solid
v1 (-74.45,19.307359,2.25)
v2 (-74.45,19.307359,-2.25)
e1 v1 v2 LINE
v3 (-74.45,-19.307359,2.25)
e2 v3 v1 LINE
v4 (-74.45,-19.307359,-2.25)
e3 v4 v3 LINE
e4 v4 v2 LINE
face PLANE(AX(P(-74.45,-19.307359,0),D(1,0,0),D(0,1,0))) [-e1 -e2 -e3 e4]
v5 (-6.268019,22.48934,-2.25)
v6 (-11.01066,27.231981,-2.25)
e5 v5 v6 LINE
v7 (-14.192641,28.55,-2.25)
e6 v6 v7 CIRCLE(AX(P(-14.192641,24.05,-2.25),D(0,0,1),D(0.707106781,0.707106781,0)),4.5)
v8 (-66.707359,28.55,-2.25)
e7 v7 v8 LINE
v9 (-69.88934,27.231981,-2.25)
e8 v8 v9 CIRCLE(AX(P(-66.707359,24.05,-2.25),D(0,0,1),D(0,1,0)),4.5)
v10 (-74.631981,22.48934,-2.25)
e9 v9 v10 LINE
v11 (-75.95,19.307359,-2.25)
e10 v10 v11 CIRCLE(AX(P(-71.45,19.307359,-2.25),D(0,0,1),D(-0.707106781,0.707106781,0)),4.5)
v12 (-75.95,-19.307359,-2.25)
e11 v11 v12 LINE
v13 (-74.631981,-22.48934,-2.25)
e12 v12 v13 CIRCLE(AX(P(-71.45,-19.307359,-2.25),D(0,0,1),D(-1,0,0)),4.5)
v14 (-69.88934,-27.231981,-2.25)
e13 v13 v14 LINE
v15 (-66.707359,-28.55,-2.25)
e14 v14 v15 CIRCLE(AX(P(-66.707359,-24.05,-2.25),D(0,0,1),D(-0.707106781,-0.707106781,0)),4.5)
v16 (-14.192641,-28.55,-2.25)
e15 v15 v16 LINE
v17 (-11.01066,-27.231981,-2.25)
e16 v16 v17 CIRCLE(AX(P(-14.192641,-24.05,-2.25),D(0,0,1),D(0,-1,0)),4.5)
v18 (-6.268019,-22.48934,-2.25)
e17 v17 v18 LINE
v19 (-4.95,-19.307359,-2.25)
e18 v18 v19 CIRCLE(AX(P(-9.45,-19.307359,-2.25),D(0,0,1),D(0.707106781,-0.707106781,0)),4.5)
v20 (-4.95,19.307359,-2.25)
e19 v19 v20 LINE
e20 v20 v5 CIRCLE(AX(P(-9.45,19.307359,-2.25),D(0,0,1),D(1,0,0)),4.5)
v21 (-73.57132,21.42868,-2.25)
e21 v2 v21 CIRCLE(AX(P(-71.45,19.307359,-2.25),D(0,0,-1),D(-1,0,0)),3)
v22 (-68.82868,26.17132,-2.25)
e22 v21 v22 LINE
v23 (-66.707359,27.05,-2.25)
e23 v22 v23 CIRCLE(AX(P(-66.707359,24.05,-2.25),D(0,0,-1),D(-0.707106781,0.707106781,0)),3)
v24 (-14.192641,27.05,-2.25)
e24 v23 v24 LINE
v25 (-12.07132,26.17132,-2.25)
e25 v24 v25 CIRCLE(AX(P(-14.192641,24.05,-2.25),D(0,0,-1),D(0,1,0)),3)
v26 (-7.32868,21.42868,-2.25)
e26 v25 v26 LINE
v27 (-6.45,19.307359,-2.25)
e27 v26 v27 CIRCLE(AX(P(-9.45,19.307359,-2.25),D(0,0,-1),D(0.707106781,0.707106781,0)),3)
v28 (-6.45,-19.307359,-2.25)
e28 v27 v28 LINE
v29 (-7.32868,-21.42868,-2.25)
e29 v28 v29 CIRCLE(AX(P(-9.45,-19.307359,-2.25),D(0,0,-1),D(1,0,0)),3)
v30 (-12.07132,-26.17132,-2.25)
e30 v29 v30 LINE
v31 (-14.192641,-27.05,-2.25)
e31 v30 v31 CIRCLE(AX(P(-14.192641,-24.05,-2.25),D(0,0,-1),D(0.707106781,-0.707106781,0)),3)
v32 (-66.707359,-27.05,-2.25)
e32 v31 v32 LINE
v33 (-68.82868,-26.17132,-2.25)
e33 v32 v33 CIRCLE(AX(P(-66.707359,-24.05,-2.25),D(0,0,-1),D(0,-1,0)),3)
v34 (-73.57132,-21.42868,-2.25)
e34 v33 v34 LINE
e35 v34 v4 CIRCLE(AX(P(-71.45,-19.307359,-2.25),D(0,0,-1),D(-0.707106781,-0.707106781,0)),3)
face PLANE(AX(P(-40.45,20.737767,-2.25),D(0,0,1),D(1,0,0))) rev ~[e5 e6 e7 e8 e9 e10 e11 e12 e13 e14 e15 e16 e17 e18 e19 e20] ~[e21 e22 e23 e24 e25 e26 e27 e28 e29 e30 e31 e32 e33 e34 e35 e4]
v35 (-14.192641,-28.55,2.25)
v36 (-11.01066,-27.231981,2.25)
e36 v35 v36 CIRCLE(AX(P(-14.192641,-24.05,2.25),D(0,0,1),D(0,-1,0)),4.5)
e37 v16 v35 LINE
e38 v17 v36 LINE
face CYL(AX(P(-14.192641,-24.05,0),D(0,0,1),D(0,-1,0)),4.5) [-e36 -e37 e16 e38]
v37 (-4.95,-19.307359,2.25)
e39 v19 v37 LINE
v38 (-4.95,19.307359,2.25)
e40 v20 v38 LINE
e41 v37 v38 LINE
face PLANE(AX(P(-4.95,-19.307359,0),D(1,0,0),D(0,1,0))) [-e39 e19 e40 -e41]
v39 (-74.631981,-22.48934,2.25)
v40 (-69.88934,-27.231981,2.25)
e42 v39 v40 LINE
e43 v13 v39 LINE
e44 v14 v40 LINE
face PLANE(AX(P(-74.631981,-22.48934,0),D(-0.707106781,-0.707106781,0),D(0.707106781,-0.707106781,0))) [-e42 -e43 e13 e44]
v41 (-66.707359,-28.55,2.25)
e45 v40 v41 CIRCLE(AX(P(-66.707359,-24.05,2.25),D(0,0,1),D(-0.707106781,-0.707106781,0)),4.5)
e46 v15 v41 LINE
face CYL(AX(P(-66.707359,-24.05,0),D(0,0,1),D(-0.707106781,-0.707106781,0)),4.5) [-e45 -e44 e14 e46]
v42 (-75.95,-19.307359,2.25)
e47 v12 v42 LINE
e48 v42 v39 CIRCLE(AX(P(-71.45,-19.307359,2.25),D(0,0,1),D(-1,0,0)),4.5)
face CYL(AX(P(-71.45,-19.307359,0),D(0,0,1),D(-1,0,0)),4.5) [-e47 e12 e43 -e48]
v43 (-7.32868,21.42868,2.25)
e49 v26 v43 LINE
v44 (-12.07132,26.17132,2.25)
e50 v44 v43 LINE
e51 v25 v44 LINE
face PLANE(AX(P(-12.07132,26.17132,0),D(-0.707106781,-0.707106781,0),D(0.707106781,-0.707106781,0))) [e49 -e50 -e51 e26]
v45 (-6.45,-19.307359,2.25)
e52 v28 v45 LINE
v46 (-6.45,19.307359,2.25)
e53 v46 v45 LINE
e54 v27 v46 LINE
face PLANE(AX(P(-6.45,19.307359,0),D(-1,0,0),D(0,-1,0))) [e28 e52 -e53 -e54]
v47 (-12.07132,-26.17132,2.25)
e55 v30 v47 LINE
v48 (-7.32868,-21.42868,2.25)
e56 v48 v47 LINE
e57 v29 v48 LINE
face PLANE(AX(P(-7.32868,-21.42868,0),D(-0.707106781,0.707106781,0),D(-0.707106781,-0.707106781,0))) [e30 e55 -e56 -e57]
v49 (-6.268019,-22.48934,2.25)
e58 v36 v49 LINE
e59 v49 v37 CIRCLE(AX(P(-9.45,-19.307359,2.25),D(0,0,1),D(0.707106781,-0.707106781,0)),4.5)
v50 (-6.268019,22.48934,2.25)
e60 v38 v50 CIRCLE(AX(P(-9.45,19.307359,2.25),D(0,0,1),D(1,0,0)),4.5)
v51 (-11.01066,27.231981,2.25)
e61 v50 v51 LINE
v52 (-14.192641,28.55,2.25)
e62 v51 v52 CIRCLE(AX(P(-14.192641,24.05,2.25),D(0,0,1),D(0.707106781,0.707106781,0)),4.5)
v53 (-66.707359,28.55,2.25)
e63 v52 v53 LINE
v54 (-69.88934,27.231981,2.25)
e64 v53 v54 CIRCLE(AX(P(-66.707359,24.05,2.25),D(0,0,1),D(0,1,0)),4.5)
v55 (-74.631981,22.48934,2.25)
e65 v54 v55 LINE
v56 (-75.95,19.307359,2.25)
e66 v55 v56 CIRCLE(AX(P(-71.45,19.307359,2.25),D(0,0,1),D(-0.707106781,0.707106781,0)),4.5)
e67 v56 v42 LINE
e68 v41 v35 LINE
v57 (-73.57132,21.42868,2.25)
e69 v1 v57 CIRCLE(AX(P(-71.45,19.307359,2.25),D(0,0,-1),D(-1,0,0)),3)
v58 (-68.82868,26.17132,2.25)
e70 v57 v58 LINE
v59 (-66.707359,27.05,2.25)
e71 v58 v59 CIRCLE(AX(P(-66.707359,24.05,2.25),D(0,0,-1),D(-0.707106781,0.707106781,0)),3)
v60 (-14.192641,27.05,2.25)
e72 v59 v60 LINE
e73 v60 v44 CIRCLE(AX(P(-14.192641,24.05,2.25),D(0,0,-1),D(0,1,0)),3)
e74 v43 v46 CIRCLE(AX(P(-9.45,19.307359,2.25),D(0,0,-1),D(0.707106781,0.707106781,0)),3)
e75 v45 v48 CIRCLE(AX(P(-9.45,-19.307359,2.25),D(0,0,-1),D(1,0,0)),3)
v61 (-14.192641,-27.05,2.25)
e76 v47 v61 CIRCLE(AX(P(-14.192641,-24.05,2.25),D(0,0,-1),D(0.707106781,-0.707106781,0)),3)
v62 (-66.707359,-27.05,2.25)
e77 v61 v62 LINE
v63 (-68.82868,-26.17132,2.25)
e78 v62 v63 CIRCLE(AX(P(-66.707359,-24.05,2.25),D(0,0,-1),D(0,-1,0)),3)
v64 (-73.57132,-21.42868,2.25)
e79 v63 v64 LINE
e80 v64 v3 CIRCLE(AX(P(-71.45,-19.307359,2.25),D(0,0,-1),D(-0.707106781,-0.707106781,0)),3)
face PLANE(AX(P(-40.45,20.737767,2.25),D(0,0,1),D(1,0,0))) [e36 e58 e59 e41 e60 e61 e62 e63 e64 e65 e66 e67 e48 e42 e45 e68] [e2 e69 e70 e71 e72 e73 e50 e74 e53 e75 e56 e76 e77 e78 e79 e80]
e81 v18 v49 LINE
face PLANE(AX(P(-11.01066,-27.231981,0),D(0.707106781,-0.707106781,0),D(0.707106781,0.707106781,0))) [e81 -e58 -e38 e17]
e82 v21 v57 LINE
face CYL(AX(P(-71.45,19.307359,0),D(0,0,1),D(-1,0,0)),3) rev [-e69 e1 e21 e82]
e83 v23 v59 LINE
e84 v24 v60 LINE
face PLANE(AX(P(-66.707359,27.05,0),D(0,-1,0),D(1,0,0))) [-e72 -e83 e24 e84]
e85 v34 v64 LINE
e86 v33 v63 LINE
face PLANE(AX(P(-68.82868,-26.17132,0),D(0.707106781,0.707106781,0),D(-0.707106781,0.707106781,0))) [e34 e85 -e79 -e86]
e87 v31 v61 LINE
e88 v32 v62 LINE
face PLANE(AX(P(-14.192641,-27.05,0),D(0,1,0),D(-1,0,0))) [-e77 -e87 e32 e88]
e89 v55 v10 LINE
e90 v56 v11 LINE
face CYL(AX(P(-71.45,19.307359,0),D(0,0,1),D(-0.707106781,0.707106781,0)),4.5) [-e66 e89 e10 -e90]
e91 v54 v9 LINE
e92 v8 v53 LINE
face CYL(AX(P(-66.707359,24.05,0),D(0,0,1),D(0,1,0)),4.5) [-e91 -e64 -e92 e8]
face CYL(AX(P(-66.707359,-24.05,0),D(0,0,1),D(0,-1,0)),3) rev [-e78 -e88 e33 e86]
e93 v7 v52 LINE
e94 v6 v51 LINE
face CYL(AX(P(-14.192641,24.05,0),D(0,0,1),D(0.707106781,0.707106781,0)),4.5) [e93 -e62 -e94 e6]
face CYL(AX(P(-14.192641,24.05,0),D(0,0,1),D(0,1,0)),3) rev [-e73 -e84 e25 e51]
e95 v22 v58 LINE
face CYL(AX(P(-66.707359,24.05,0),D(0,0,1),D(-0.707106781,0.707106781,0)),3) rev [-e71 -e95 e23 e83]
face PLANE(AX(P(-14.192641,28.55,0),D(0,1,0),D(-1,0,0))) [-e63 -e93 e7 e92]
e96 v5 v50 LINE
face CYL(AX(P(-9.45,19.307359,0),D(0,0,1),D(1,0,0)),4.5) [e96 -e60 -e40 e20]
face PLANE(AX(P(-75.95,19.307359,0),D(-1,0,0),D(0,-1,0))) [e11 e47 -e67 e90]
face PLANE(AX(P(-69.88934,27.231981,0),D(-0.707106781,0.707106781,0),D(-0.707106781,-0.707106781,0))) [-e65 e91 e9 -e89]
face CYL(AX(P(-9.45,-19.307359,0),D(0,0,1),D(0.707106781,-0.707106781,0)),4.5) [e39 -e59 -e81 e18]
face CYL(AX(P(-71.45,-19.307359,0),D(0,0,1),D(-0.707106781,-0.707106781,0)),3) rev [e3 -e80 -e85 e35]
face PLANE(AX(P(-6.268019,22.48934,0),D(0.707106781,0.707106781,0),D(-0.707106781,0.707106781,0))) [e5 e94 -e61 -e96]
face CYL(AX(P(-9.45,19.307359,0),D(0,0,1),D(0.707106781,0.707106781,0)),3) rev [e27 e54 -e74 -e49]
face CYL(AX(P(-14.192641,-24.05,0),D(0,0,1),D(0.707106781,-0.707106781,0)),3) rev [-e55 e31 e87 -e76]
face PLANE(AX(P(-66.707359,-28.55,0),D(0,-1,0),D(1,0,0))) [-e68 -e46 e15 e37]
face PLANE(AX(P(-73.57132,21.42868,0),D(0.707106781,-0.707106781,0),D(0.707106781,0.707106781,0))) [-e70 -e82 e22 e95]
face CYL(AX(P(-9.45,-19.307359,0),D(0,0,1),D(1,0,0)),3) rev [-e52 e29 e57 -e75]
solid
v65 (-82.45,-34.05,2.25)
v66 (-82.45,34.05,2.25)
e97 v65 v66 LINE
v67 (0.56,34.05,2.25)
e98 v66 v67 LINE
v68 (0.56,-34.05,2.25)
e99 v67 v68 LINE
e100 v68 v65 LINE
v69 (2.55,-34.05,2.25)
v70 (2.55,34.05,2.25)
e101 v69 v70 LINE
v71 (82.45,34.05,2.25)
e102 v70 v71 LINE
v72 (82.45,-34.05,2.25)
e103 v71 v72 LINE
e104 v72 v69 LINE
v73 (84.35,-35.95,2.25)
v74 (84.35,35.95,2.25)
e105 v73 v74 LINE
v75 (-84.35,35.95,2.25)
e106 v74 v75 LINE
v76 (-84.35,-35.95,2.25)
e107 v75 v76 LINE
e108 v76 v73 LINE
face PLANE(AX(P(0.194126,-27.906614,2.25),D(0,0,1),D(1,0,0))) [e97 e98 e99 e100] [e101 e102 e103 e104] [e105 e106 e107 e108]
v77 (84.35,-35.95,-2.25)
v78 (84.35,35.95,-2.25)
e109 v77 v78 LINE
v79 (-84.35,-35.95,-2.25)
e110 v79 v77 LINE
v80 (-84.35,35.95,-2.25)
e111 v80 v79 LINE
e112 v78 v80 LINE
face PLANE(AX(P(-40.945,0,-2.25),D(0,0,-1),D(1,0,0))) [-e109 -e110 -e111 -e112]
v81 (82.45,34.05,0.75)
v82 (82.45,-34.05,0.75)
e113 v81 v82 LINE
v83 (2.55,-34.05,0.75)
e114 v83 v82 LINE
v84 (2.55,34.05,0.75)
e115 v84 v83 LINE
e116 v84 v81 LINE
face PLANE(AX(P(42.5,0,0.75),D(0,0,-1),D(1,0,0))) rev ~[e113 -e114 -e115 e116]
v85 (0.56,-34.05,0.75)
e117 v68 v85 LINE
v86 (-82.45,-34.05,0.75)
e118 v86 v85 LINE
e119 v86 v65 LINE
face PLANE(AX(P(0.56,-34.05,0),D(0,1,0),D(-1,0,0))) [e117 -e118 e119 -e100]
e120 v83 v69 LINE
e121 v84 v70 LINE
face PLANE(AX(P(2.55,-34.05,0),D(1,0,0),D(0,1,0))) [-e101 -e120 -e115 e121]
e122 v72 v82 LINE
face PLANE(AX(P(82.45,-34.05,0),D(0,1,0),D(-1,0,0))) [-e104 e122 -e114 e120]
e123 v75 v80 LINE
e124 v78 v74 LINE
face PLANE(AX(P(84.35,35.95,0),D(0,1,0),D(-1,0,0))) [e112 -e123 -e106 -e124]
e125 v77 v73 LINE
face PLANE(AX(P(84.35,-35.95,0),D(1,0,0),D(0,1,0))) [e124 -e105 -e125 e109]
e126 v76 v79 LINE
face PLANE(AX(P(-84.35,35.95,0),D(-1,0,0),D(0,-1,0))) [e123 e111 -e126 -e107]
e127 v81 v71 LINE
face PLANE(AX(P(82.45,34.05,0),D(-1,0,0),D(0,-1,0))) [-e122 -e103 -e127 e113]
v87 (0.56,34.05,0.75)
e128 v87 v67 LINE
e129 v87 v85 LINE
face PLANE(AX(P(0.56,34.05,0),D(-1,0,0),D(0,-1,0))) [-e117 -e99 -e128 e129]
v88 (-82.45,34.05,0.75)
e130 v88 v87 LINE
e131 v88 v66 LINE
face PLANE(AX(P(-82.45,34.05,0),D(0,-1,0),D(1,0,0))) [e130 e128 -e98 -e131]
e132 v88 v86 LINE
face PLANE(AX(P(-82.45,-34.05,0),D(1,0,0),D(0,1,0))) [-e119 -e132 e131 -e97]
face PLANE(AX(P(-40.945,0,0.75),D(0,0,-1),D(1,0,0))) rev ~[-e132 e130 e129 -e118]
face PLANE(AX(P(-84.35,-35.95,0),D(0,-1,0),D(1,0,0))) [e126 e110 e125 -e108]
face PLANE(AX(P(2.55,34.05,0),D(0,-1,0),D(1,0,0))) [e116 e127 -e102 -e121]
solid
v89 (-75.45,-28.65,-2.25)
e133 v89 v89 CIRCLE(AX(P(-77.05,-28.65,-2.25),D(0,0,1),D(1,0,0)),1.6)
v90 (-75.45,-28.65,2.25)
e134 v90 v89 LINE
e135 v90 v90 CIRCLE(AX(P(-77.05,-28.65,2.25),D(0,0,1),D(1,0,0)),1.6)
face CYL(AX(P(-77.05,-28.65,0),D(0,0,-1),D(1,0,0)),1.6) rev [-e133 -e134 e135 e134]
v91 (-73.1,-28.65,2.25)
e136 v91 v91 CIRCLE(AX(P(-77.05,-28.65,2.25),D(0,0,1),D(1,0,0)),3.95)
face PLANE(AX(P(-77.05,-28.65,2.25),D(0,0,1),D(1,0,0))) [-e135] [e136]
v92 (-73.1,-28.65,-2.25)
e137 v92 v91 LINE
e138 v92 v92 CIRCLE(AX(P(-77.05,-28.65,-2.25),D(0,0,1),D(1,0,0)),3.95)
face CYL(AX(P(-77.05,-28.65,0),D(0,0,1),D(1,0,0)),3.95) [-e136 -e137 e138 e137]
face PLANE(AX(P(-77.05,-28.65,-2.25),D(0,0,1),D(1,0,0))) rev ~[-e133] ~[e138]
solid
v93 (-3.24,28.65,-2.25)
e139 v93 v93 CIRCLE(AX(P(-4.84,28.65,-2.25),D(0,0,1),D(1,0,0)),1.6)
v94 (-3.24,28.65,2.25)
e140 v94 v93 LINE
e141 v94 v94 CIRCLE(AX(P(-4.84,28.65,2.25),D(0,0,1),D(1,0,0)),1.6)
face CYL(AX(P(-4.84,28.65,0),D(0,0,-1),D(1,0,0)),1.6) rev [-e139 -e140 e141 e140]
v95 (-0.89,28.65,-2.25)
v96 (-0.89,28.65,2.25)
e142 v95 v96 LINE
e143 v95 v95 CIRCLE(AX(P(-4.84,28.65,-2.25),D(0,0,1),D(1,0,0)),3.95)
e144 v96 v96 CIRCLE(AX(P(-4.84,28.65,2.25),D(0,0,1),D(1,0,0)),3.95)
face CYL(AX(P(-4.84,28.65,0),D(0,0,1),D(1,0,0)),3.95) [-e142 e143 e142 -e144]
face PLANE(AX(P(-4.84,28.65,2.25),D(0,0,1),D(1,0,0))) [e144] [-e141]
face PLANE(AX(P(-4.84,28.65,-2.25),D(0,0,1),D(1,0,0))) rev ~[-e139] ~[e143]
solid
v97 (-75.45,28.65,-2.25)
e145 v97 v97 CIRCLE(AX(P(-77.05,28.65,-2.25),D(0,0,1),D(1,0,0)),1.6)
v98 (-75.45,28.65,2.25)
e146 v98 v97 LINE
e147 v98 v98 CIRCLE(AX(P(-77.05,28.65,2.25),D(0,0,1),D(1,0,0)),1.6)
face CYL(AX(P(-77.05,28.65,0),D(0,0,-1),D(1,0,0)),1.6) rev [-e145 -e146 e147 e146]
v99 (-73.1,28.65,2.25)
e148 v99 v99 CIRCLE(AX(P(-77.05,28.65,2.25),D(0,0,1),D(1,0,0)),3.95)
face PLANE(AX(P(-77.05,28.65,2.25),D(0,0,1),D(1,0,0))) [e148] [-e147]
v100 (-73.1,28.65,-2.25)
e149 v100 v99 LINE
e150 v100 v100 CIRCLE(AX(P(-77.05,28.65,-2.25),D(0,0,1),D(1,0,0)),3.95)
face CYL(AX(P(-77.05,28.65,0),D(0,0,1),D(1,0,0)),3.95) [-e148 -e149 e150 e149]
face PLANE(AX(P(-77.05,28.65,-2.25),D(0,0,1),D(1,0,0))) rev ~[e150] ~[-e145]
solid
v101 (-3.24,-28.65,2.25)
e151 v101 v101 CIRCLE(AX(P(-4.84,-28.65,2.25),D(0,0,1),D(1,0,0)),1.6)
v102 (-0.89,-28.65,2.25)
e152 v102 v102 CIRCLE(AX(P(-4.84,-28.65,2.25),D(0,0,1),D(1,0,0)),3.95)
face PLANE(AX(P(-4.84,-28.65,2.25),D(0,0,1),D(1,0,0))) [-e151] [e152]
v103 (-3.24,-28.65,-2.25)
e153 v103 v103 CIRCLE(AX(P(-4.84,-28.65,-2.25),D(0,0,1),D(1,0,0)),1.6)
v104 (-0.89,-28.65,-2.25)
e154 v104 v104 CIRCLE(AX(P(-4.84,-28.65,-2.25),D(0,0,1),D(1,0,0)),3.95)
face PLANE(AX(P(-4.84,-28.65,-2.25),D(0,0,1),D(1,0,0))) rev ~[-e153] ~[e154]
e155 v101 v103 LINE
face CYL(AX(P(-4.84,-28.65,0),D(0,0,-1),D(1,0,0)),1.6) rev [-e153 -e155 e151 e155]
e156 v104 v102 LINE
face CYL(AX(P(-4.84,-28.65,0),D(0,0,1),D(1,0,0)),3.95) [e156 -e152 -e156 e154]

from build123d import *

# Parameters (mm, degrees)
F1_DEPTH = 2.25
F0_R     = 3.95
F0_R_2   = 1.6
F2_W     = 83.01
F2_H     = 68.1
F2_W_2   = 79.9
F3_DEPTH = 3


# Not quite as in the source:
# - a feature of the source that left no trace in its solid (it failed there, or was rolled back) is left out


with BuildPart() as f1:
    # F0 (on Top) → F1 (new body, symmetric)
    with BuildSketch(Plane.XY):
        Polygon((-84.35, -35.95), (84.35, -35.95), (84.35, 0), (82.45, 0), (82.45, -34.05), (2.55, -34.05), (2.55, 0), (0.56, 0), (0.56, -34.05), (-82.45, -34.05), (-82.45, 0), (-84.35, 0), align=None)
        Polygon((82.45, 0), (84.35, 0), (84.35, 35.95), (-84.35, 35.95), (-84.35, 0), (-82.45, 0), (-82.45, 34.05), (0.56, 34.05), (0.56, 0), (2.55, 0), (2.55, 34.05), (82.45, 34.05), align=None)
    extrude(amount=F1_DEPTH, both=True)

    # F2 (on face) → F3 (join)
    with BuildSketch(Plane(origin=(0, 0, -2.25), x_dir=(1, 0, 0), z_dir=(0, 0, -1))):
        with Locations((-40.945, 0)):
            Rectangle(F2_W, F2_H)
        with Locations((42.5, 0)):
            Rectangle(F2_W_2, F2_H)
    extrude(amount=-F3_DEPTH)


with BuildPart() as f1b:
    # F0 (on Top) → F1, piece 2 (new body, symmetric)
    with BuildSketch(Plane.XY):
        with Locations((-77.05, 28.65)):
            Circle(F0_R)
        with Locations((-77.05, 28.65)):
            Circle(F0_R_2, mode=Mode.SUBTRACT)
    extrude(amount=F1_DEPTH, both=True)


with BuildPart() as f1c:
    # F0 (on Top) → F1, piece 3 (new body, symmetric)
    with BuildSketch(Plane.XY):
        with Locations((-77.05, -28.65)):
            Circle(F0_R)
        with Locations((-77.05, -28.65)):
            Circle(F0_R_2, mode=Mode.SUBTRACT)
    extrude(amount=F1_DEPTH, both=True)


with BuildPart() as f1d:
    # F0 (on Top) → F1, piece 4 (new body, symmetric)
    with BuildSketch(Plane.XY):
        with Locations((-4.84, 28.65)):
            Circle(F0_R)
        with Locations((-4.84, 28.65)):
            Circle(F0_R_2, mode=Mode.SUBTRACT)
    extrude(amount=F1_DEPTH, both=True)


with BuildPart() as f1e:
    # F0 (on Top) → F1, piece 5 (new body, symmetric)
    with BuildSketch(Plane.XY):
        with Locations((-4.84, -28.65)):
            Circle(F0_R)
        with Locations((-4.84, -28.65)):
            Circle(F0_R_2, mode=Mode.SUBTRACT)
    extrude(amount=F1_DEPTH, both=True)


with BuildPart() as f1f:
    # F0 (on Top) → F1, piece 6 (new body, symmetric)
    with BuildSketch(Plane.XY):
        with BuildLine():
            Line((-75.95, 19.3073593129), (-75.95, 0))
            Line((-75.95, 0), (-74.45, 0))
            Line((-74.45, 0), (-74.45, 19.3073593129))
            ThreePointArc((-74.45, 19.3073593129), (-74.2216385975, 20.45540961), (-73.5713203436, 21.4286796564))
            Line((-73.5713203436, 21.4286796564), (-68.8286796564, 26.1713203436))
            ThreePointArc((-68.8286796564, 26.1713203436), (-67.85540961, 26.8216385975), (-66.7073593129, 27.05))
            Line((-66.7073593129, 27.05), (-14.1926406871, 27.05))
            ThreePointArc((-14.1926406871, 27.05), (-13.04459039, 26.8216385975), (-12.0713203436, 26.1713203436))
            Line((-12.0713203436, 26.1713203436), (-7.3286796564, 21.4286796564))
            ThreePointArc((-7.3286796564, 21.4286796564), (-6.6783614025, 20.45540961), (-6.45, 19.3073593129))
            Line((-6.45, 19.3073593129), (-6.45, 0))
            Line((-6.45, 0), (-4.95, 0))
            Line((-4.95, 0), (-4.95, 19.3073593129))
            ThreePointArc((-4.95, 19.3073593129), (-5.2925421037, 21.0294347585), (-6.2680194847, 22.4893398282))
            Line((-6.2680194847, 22.4893398282), (-11.0106601718, 27.2319805153))
            ThreePointArc((-11.0106601718, 27.2319805153), (-12.4705652415, 28.2074578963), (-14.1926406871, 28.55))
            Line((-14.1926406871, 28.55), (-66.7073593129, 28.55))
            ThreePointArc((-66.7073593129, 28.55), (-68.4294347585, 28.2074578963), (-69.8893398282, 27.2319805153))
            Line((-69.8893398282, 27.2319805153), (-74.6319805153, 22.4893398282))
            ThreePointArc((-74.6319805153, 22.4893398282), (-75.6074578963, 21.0294347585), (-75.95, 19.3073593129))
        make_face()
        with BuildLine():
            Line((-74.45, 0), (-75.95, 0))
            Line((-75.95, 0), (-75.95, -19.3073593129))
            ThreePointArc((-75.95, -19.3073593129), (-75.6074578963, -21.0294347585), (-74.6319805153, -22.4893398282))
            Line((-74.6319805153, -22.4893398282), (-69.8893398282, -27.2319805153))
            ThreePointArc((-69.8893398282, -27.2319805153), (-68.4294347585, -28.2074578963), (-66.7073593129, -28.55))
            Line((-66.7073593129, -28.55), (-14.1926406871, -28.55))
            ThreePointArc((-14.1926406871, -28.55), (-12.4705652415, -28.2074578963), (-11.0106601718, -27.2319805153))
            Line((-11.0106601718, -27.2319805153), (-6.2680194847, -22.4893398282))
            ThreePointArc((-6.2680194847, -22.4893398282), (-5.2925421037, -21.0294347585), (-4.95, -19.3073593129))
            Line((-4.95, -19.3073593129), (-4.95, 0))
            Line((-4.95, 0), (-6.45, 0))
            Line((-6.45, 0), (-6.45, -19.3073593129))
            ThreePointArc((-6.45, -19.3073593129), (-6.6783614025, -20.45540961), (-7.3286796564, -21.4286796564))
            Line((-7.3286796564, -21.4286796564), (-12.0713203436, -26.1713203436))
            ThreePointArc((-12.0713203436, -26.1713203436), (-13.04459039, -26.8216385975), (-14.1926406871, -27.05))
            Line((-14.1926406871, -27.05), (-66.7073593129, -27.05))
            ThreePointArc((-66.7073593129, -27.05), (-67.85540961, -26.8216385975), (-68.8286796564, -26.1713203436))
            Line((-68.8286796564, -26.1713203436), (-73.5713203436, -21.4286796564))
            ThreePointArc((-73.5713203436, -21.4286796564), (-74.2216385975, -20.45540961), (-74.45, -19.3073593129))
            Line((-74.45, -19.3073593129), (-74.45, 0))
        make_face()
    extrude(amount=F1_DEPTH, both=True)


solid = Compound([f1.part, f1b.part, f1c.part, f1d.part, f1e.part, f1f.part])
